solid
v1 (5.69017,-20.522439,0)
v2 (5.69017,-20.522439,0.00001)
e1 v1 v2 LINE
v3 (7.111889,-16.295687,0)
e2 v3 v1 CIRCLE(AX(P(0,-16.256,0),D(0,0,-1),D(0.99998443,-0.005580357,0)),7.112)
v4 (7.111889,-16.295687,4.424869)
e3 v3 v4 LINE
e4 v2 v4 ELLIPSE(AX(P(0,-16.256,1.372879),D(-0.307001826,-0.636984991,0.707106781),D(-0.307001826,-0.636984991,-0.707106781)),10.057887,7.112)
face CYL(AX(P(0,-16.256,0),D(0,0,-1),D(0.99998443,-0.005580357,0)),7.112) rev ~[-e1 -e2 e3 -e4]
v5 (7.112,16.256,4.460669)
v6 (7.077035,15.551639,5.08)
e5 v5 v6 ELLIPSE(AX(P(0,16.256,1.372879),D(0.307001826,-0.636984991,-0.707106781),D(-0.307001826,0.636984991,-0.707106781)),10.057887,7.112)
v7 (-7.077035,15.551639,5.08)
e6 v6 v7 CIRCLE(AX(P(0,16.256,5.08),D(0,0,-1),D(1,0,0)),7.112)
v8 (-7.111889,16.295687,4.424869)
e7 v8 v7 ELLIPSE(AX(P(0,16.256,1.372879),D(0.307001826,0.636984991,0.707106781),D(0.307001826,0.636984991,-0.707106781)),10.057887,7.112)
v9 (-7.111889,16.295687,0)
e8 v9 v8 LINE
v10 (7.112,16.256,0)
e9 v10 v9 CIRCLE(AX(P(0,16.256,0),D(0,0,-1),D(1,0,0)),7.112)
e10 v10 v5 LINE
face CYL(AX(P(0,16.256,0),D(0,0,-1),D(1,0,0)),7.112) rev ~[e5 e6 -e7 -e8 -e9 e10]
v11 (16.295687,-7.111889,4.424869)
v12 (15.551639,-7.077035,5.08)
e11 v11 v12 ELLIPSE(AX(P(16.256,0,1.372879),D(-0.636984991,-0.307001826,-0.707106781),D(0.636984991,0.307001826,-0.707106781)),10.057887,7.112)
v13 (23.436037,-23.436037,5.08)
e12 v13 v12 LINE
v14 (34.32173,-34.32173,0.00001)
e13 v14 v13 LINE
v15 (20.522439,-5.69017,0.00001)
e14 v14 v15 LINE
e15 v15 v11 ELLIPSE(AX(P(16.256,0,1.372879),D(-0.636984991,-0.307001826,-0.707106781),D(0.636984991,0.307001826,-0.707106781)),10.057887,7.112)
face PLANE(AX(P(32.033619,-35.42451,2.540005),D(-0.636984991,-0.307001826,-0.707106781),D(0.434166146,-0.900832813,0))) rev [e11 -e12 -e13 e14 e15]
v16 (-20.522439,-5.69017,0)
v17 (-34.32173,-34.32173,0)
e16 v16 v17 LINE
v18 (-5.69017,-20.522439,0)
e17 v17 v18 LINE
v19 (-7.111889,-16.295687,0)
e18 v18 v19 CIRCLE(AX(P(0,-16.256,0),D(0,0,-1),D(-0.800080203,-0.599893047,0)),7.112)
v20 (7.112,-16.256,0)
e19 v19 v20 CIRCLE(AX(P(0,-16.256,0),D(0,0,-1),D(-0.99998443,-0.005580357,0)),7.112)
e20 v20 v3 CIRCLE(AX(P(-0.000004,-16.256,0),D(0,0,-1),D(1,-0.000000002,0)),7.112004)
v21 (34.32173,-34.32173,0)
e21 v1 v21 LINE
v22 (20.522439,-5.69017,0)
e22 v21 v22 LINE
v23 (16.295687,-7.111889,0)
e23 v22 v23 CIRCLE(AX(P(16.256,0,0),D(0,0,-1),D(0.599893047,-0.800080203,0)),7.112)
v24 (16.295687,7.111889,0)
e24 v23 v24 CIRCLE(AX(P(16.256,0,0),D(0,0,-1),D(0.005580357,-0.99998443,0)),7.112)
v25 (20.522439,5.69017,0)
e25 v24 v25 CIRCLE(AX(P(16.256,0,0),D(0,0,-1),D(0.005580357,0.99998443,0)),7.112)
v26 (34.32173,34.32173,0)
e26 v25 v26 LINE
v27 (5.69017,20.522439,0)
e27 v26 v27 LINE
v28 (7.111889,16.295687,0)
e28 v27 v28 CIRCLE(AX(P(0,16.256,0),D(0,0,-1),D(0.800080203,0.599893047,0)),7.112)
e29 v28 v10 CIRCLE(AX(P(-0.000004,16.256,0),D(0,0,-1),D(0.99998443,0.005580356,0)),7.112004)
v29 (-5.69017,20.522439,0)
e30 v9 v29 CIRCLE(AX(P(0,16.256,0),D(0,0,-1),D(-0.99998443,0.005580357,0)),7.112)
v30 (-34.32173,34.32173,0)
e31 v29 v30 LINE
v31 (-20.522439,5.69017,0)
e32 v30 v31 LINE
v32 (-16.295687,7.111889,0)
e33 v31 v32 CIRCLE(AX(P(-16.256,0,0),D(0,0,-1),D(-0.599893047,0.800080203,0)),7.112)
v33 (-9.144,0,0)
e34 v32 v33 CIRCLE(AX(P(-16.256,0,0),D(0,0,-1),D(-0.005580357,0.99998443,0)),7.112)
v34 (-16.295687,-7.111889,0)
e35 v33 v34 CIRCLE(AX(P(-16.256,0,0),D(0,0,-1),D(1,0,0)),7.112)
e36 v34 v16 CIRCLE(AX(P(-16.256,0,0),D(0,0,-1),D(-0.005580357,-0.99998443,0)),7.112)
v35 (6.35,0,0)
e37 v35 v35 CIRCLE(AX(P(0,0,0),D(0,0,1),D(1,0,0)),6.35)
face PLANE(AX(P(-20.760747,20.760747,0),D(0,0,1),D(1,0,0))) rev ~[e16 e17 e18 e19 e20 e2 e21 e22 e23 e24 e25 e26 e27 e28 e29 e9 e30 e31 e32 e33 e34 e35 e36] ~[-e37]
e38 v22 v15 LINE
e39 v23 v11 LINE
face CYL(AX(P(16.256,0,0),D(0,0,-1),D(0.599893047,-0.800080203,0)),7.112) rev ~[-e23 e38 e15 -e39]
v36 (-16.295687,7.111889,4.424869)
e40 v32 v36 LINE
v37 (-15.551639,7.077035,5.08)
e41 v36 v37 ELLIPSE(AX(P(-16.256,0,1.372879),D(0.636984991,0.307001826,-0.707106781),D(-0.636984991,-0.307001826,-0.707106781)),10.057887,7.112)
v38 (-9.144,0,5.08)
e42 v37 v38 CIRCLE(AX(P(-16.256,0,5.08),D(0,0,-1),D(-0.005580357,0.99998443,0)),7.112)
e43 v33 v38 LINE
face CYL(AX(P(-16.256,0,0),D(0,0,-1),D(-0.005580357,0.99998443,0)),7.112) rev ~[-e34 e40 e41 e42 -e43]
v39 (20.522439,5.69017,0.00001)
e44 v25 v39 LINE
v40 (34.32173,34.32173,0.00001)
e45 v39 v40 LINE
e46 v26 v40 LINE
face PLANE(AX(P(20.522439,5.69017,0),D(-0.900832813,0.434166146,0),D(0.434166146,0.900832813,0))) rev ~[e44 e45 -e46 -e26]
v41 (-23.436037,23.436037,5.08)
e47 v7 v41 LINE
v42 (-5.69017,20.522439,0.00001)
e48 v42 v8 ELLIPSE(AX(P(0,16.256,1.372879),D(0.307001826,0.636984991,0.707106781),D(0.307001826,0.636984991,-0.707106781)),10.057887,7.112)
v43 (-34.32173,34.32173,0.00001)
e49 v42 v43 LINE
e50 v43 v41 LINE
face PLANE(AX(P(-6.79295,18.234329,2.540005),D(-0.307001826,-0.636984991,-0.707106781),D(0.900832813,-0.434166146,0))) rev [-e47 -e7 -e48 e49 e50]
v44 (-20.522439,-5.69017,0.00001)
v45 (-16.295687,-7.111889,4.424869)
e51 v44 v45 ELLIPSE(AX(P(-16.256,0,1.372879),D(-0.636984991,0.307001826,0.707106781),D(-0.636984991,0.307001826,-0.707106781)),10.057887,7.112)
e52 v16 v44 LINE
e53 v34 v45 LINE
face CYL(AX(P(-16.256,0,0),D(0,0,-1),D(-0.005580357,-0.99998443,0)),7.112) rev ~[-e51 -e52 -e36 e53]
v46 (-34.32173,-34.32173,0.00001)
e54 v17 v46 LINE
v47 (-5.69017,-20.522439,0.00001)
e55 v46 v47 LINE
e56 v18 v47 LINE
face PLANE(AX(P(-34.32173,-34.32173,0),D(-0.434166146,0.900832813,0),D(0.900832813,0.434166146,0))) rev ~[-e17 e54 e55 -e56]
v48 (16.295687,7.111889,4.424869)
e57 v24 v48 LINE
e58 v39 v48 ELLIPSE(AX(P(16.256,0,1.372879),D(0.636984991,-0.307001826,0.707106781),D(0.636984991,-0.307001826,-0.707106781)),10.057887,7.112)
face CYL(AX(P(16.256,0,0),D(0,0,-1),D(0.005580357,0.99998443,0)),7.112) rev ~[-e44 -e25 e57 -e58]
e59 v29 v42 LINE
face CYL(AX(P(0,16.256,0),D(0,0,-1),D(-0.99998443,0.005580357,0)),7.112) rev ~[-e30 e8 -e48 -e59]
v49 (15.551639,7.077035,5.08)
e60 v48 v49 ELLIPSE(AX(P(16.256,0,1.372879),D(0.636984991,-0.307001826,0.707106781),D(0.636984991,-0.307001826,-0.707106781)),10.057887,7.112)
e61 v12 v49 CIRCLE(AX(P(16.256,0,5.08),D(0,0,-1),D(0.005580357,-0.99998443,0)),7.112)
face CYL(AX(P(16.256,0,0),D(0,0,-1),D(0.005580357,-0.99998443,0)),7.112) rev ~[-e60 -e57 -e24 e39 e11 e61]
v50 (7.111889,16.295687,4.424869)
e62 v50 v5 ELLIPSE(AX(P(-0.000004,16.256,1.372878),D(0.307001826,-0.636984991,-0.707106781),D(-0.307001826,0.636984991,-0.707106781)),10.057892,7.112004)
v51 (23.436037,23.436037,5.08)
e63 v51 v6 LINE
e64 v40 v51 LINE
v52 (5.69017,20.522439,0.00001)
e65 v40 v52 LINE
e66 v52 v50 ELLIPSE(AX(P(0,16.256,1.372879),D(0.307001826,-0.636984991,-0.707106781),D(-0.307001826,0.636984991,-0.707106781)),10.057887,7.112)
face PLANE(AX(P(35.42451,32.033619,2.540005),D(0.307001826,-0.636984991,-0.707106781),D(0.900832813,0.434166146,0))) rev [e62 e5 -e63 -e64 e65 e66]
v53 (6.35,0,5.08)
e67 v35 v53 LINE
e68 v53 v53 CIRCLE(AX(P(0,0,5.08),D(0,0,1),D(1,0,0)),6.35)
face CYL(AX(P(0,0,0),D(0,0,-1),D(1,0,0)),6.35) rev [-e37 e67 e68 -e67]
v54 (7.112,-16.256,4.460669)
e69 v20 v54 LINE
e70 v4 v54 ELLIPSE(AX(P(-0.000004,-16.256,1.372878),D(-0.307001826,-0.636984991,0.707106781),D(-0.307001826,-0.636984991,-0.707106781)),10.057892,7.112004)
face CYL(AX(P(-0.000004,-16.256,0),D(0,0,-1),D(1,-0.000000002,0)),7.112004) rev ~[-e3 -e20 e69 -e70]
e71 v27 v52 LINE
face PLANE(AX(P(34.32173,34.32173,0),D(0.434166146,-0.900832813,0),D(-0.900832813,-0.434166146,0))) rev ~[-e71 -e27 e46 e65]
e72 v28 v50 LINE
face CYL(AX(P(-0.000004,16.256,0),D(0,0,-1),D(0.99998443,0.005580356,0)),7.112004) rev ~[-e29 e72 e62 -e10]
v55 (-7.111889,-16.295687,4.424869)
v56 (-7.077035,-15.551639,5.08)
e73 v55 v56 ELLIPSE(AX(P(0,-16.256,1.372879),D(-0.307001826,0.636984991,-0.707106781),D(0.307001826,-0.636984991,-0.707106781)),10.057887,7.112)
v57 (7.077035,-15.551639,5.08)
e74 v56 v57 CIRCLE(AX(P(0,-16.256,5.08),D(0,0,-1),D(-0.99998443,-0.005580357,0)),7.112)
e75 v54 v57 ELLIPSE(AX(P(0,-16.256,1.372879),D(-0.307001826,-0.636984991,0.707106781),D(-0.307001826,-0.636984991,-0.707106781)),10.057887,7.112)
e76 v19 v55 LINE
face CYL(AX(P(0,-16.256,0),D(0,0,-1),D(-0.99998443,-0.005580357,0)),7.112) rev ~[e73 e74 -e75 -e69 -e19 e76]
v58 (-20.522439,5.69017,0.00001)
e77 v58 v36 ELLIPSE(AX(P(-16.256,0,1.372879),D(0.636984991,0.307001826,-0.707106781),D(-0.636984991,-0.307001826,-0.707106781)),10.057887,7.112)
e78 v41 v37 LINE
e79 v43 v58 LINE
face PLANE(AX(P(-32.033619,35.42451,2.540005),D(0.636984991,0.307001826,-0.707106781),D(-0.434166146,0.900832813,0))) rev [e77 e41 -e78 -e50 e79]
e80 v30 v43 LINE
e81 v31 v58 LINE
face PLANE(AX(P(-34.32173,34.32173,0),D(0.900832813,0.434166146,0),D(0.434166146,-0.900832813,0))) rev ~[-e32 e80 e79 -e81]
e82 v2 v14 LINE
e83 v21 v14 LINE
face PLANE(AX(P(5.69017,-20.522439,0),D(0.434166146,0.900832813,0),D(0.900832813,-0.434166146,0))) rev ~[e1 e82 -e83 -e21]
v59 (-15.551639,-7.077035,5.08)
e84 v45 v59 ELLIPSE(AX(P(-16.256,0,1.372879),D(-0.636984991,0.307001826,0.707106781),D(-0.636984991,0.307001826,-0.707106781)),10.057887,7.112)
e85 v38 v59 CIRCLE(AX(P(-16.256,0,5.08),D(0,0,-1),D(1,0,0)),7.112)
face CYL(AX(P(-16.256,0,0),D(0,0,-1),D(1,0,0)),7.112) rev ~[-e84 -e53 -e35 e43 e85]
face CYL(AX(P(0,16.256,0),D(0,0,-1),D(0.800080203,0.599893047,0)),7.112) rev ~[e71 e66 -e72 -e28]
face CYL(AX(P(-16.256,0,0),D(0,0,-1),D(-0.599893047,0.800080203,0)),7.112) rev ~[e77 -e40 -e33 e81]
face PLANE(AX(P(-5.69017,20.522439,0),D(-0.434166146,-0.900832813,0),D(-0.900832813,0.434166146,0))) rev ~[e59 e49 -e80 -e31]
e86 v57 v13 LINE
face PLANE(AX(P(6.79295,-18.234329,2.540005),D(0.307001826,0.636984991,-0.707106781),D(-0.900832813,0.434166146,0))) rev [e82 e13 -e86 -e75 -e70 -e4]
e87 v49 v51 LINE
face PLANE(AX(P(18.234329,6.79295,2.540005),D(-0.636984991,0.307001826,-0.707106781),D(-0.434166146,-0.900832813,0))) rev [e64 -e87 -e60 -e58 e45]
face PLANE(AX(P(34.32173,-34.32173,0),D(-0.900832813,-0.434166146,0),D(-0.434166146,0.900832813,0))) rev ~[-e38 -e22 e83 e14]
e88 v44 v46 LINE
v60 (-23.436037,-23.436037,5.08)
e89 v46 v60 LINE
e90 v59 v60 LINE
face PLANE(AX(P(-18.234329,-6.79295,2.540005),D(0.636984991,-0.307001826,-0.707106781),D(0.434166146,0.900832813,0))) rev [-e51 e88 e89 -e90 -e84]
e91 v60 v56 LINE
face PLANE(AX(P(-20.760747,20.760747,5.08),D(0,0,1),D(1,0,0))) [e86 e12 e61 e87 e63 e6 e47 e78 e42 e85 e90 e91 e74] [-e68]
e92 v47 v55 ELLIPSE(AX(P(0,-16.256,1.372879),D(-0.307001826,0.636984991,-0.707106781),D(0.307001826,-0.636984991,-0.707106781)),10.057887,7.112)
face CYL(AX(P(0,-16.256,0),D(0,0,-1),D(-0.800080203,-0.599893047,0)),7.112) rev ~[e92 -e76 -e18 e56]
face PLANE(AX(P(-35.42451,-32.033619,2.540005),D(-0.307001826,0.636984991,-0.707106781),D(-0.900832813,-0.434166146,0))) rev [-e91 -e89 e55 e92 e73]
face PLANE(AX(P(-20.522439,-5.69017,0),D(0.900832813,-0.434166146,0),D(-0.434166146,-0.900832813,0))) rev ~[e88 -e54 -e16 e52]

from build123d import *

# Parameters (mm, degrees)
F0_R     = 6.35
F1_DEPTH = 5.08
F2_SIZE  = 5.07999


# Not quite as in the source:
# - a fillet or chamfer is up to 0.001 mm smaller than in the source, because OpenCascade refuses the exact size


with BuildPart() as f1:
    # F0 (on Top) → F1 (new body)
    with BuildSketch(Plane.XY):
        with BuildLine():
            ThreePointArc((-16.2956875, 7.1118892639), (-12.5723585695, 12.5723585695), (-7.1118892639, 16.2956875))
            ThreePointArc((-7.1118892639, 16.2956875), (-6.7408857543, 18.5233780558), (-5.6901704054, 20.5224393535))
            Line((-5.6901704054, 20.5224393535), (-34.321730181, 34.321730181))
            Line((-34.321730181, 34.321730181), (-20.5224393535, 5.6901704054))
            ThreePointArc((-20.5224393535, 5.6901704054), (-18.5233780558, 6.7408857543), (-16.2956875, 7.1118892639))
        make_face()
        with BuildLine():
            ThreePointArc((16.2956875, -7.1118892639), (9.144, 0), (16.2956875, 7.1118892639))
            ThreePointArc((16.2956875, 7.1118892639), (12.5723585695, 12.5723585695), (7.1118892639, 16.2956875))
            ThreePointArc((7.1118892639, 16.2956875), (7.1119723159, 16.2758438272), (7.112, 16.256))
            ThreePointArc((7.112, 16.256), (-0.0198438272, 9.1440276841), (-7.1118892639, 16.2956875))
            ThreePointArc((-7.1118892639, 16.2956875), (-12.5723585695, 12.5723585695), (-16.2956875, 7.1118892639))
            ThreePointArc((-16.2956875, 7.1118892639), (-11.2411078526, 5.042955557), (-9.144, 0))
            ThreePointArc((-9.144, 0), (-11.2411078526, -5.042955557), (-16.2956875, -7.1118892639))
            ThreePointArc((-16.2956875, -7.1118892639), (-12.5723585695, -12.5723585695), (-7.1118892639, -16.2956875))
            ThreePointArc((-7.1118892639, -16.2956875), (-0.0198438272, -9.1440276841), (7.112, -16.256))
            ThreePointArc((7.112, -16.256), (7.1119723159, -16.2758438272), (7.1118892639, -16.2956875))
            ThreePointArc((7.1118892639, -16.2956875), (12.5723585695, -12.5723585695), (16.2956875, -7.1118892639))
        make_face()
        Circle(F0_R, mode=Mode.SUBTRACT)
        with BuildLine():
            ThreePointArc((7.1118892639, 16.2956875), (12.5723585695, 12.5723585695), (16.2956875, 7.1118892639))
            ThreePointArc((16.2956875, 7.1118892639), (18.5233780558, 6.7408857543), (20.5224393535, 5.6901704054))
            Line((20.5224393535, 5.6901704054), (34.321730181, 34.321730181))
            Line((34.321730181, 34.321730181), (5.6901704054, 20.5224393535))
            ThreePointArc((5.6901704054, 20.5224393535), (6.7408857543, 18.5233780558), (7.1118892639, 16.2956875))
        make_face()
        with BuildLine():
            ThreePointArc((20.5224393535, -5.6901704054), (18.5233780558, -6.7408857543), (16.2956875, -7.1118892639))
            ThreePointArc((16.2956875, -7.1118892639), (12.5723585695, -12.5723585695), (7.1118892639, -16.2956875))
            ThreePointArc((7.1118892639, -16.2956875), (6.7408857543, -18.5233780558), (5.6901704054, -20.5224393535))
            Line((5.6901704054, -20.5224393535), (34.321730181, -34.321730181))
            Line((34.321730181, -34.321730181), (20.5224393535, -5.6901704054))
        make_face()
        with BuildLine():
            ThreePointArc((-5.6901704054, -20.5224393535), (-6.7408857543, -18.5233780558), (-7.1118892639, -16.2956875))
            ThreePointArc((-7.1118892639, -16.2956875), (-12.5723585695, -12.5723585695), (-16.2956875, -7.1118892639))
            ThreePointArc((-16.2956875, -7.1118892639), (-18.5233780558, -6.7408857543), (-20.5224393535, -5.6901704054))
            Line((-20.5224393535, -5.6901704054), (-34.321730181, -34.321730181))
            Line((-34.321730181, -34.321730181), (-5.6901704054, -20.5224393535))
        make_face()
    extrude(amount=F1_DEPTH)

    # F2 (size 5.08 in the source; OpenCascade refuses exactly that, so slightly less here)
    f2_edges = [f1.edges().sort_by_distance(p)[0] for p in [
        (-27.422085, 20.00595, 5.08),
        (-20.00595, 27.422085, 5.08),
        (20.00595, 27.422085, 5.08),
        (27.422085, 20.00595, 5.08),
        (27.422085, -20.00595, 5.08),
        (20.00595, -27.422085, 5.08),
        (-20.00595, -27.422085, 5.08),
        (-27.422085, -20.00595, 5.08),
    ]]
    chamfer(f2_edges, length=F2_SIZE)


solid = f1.part
